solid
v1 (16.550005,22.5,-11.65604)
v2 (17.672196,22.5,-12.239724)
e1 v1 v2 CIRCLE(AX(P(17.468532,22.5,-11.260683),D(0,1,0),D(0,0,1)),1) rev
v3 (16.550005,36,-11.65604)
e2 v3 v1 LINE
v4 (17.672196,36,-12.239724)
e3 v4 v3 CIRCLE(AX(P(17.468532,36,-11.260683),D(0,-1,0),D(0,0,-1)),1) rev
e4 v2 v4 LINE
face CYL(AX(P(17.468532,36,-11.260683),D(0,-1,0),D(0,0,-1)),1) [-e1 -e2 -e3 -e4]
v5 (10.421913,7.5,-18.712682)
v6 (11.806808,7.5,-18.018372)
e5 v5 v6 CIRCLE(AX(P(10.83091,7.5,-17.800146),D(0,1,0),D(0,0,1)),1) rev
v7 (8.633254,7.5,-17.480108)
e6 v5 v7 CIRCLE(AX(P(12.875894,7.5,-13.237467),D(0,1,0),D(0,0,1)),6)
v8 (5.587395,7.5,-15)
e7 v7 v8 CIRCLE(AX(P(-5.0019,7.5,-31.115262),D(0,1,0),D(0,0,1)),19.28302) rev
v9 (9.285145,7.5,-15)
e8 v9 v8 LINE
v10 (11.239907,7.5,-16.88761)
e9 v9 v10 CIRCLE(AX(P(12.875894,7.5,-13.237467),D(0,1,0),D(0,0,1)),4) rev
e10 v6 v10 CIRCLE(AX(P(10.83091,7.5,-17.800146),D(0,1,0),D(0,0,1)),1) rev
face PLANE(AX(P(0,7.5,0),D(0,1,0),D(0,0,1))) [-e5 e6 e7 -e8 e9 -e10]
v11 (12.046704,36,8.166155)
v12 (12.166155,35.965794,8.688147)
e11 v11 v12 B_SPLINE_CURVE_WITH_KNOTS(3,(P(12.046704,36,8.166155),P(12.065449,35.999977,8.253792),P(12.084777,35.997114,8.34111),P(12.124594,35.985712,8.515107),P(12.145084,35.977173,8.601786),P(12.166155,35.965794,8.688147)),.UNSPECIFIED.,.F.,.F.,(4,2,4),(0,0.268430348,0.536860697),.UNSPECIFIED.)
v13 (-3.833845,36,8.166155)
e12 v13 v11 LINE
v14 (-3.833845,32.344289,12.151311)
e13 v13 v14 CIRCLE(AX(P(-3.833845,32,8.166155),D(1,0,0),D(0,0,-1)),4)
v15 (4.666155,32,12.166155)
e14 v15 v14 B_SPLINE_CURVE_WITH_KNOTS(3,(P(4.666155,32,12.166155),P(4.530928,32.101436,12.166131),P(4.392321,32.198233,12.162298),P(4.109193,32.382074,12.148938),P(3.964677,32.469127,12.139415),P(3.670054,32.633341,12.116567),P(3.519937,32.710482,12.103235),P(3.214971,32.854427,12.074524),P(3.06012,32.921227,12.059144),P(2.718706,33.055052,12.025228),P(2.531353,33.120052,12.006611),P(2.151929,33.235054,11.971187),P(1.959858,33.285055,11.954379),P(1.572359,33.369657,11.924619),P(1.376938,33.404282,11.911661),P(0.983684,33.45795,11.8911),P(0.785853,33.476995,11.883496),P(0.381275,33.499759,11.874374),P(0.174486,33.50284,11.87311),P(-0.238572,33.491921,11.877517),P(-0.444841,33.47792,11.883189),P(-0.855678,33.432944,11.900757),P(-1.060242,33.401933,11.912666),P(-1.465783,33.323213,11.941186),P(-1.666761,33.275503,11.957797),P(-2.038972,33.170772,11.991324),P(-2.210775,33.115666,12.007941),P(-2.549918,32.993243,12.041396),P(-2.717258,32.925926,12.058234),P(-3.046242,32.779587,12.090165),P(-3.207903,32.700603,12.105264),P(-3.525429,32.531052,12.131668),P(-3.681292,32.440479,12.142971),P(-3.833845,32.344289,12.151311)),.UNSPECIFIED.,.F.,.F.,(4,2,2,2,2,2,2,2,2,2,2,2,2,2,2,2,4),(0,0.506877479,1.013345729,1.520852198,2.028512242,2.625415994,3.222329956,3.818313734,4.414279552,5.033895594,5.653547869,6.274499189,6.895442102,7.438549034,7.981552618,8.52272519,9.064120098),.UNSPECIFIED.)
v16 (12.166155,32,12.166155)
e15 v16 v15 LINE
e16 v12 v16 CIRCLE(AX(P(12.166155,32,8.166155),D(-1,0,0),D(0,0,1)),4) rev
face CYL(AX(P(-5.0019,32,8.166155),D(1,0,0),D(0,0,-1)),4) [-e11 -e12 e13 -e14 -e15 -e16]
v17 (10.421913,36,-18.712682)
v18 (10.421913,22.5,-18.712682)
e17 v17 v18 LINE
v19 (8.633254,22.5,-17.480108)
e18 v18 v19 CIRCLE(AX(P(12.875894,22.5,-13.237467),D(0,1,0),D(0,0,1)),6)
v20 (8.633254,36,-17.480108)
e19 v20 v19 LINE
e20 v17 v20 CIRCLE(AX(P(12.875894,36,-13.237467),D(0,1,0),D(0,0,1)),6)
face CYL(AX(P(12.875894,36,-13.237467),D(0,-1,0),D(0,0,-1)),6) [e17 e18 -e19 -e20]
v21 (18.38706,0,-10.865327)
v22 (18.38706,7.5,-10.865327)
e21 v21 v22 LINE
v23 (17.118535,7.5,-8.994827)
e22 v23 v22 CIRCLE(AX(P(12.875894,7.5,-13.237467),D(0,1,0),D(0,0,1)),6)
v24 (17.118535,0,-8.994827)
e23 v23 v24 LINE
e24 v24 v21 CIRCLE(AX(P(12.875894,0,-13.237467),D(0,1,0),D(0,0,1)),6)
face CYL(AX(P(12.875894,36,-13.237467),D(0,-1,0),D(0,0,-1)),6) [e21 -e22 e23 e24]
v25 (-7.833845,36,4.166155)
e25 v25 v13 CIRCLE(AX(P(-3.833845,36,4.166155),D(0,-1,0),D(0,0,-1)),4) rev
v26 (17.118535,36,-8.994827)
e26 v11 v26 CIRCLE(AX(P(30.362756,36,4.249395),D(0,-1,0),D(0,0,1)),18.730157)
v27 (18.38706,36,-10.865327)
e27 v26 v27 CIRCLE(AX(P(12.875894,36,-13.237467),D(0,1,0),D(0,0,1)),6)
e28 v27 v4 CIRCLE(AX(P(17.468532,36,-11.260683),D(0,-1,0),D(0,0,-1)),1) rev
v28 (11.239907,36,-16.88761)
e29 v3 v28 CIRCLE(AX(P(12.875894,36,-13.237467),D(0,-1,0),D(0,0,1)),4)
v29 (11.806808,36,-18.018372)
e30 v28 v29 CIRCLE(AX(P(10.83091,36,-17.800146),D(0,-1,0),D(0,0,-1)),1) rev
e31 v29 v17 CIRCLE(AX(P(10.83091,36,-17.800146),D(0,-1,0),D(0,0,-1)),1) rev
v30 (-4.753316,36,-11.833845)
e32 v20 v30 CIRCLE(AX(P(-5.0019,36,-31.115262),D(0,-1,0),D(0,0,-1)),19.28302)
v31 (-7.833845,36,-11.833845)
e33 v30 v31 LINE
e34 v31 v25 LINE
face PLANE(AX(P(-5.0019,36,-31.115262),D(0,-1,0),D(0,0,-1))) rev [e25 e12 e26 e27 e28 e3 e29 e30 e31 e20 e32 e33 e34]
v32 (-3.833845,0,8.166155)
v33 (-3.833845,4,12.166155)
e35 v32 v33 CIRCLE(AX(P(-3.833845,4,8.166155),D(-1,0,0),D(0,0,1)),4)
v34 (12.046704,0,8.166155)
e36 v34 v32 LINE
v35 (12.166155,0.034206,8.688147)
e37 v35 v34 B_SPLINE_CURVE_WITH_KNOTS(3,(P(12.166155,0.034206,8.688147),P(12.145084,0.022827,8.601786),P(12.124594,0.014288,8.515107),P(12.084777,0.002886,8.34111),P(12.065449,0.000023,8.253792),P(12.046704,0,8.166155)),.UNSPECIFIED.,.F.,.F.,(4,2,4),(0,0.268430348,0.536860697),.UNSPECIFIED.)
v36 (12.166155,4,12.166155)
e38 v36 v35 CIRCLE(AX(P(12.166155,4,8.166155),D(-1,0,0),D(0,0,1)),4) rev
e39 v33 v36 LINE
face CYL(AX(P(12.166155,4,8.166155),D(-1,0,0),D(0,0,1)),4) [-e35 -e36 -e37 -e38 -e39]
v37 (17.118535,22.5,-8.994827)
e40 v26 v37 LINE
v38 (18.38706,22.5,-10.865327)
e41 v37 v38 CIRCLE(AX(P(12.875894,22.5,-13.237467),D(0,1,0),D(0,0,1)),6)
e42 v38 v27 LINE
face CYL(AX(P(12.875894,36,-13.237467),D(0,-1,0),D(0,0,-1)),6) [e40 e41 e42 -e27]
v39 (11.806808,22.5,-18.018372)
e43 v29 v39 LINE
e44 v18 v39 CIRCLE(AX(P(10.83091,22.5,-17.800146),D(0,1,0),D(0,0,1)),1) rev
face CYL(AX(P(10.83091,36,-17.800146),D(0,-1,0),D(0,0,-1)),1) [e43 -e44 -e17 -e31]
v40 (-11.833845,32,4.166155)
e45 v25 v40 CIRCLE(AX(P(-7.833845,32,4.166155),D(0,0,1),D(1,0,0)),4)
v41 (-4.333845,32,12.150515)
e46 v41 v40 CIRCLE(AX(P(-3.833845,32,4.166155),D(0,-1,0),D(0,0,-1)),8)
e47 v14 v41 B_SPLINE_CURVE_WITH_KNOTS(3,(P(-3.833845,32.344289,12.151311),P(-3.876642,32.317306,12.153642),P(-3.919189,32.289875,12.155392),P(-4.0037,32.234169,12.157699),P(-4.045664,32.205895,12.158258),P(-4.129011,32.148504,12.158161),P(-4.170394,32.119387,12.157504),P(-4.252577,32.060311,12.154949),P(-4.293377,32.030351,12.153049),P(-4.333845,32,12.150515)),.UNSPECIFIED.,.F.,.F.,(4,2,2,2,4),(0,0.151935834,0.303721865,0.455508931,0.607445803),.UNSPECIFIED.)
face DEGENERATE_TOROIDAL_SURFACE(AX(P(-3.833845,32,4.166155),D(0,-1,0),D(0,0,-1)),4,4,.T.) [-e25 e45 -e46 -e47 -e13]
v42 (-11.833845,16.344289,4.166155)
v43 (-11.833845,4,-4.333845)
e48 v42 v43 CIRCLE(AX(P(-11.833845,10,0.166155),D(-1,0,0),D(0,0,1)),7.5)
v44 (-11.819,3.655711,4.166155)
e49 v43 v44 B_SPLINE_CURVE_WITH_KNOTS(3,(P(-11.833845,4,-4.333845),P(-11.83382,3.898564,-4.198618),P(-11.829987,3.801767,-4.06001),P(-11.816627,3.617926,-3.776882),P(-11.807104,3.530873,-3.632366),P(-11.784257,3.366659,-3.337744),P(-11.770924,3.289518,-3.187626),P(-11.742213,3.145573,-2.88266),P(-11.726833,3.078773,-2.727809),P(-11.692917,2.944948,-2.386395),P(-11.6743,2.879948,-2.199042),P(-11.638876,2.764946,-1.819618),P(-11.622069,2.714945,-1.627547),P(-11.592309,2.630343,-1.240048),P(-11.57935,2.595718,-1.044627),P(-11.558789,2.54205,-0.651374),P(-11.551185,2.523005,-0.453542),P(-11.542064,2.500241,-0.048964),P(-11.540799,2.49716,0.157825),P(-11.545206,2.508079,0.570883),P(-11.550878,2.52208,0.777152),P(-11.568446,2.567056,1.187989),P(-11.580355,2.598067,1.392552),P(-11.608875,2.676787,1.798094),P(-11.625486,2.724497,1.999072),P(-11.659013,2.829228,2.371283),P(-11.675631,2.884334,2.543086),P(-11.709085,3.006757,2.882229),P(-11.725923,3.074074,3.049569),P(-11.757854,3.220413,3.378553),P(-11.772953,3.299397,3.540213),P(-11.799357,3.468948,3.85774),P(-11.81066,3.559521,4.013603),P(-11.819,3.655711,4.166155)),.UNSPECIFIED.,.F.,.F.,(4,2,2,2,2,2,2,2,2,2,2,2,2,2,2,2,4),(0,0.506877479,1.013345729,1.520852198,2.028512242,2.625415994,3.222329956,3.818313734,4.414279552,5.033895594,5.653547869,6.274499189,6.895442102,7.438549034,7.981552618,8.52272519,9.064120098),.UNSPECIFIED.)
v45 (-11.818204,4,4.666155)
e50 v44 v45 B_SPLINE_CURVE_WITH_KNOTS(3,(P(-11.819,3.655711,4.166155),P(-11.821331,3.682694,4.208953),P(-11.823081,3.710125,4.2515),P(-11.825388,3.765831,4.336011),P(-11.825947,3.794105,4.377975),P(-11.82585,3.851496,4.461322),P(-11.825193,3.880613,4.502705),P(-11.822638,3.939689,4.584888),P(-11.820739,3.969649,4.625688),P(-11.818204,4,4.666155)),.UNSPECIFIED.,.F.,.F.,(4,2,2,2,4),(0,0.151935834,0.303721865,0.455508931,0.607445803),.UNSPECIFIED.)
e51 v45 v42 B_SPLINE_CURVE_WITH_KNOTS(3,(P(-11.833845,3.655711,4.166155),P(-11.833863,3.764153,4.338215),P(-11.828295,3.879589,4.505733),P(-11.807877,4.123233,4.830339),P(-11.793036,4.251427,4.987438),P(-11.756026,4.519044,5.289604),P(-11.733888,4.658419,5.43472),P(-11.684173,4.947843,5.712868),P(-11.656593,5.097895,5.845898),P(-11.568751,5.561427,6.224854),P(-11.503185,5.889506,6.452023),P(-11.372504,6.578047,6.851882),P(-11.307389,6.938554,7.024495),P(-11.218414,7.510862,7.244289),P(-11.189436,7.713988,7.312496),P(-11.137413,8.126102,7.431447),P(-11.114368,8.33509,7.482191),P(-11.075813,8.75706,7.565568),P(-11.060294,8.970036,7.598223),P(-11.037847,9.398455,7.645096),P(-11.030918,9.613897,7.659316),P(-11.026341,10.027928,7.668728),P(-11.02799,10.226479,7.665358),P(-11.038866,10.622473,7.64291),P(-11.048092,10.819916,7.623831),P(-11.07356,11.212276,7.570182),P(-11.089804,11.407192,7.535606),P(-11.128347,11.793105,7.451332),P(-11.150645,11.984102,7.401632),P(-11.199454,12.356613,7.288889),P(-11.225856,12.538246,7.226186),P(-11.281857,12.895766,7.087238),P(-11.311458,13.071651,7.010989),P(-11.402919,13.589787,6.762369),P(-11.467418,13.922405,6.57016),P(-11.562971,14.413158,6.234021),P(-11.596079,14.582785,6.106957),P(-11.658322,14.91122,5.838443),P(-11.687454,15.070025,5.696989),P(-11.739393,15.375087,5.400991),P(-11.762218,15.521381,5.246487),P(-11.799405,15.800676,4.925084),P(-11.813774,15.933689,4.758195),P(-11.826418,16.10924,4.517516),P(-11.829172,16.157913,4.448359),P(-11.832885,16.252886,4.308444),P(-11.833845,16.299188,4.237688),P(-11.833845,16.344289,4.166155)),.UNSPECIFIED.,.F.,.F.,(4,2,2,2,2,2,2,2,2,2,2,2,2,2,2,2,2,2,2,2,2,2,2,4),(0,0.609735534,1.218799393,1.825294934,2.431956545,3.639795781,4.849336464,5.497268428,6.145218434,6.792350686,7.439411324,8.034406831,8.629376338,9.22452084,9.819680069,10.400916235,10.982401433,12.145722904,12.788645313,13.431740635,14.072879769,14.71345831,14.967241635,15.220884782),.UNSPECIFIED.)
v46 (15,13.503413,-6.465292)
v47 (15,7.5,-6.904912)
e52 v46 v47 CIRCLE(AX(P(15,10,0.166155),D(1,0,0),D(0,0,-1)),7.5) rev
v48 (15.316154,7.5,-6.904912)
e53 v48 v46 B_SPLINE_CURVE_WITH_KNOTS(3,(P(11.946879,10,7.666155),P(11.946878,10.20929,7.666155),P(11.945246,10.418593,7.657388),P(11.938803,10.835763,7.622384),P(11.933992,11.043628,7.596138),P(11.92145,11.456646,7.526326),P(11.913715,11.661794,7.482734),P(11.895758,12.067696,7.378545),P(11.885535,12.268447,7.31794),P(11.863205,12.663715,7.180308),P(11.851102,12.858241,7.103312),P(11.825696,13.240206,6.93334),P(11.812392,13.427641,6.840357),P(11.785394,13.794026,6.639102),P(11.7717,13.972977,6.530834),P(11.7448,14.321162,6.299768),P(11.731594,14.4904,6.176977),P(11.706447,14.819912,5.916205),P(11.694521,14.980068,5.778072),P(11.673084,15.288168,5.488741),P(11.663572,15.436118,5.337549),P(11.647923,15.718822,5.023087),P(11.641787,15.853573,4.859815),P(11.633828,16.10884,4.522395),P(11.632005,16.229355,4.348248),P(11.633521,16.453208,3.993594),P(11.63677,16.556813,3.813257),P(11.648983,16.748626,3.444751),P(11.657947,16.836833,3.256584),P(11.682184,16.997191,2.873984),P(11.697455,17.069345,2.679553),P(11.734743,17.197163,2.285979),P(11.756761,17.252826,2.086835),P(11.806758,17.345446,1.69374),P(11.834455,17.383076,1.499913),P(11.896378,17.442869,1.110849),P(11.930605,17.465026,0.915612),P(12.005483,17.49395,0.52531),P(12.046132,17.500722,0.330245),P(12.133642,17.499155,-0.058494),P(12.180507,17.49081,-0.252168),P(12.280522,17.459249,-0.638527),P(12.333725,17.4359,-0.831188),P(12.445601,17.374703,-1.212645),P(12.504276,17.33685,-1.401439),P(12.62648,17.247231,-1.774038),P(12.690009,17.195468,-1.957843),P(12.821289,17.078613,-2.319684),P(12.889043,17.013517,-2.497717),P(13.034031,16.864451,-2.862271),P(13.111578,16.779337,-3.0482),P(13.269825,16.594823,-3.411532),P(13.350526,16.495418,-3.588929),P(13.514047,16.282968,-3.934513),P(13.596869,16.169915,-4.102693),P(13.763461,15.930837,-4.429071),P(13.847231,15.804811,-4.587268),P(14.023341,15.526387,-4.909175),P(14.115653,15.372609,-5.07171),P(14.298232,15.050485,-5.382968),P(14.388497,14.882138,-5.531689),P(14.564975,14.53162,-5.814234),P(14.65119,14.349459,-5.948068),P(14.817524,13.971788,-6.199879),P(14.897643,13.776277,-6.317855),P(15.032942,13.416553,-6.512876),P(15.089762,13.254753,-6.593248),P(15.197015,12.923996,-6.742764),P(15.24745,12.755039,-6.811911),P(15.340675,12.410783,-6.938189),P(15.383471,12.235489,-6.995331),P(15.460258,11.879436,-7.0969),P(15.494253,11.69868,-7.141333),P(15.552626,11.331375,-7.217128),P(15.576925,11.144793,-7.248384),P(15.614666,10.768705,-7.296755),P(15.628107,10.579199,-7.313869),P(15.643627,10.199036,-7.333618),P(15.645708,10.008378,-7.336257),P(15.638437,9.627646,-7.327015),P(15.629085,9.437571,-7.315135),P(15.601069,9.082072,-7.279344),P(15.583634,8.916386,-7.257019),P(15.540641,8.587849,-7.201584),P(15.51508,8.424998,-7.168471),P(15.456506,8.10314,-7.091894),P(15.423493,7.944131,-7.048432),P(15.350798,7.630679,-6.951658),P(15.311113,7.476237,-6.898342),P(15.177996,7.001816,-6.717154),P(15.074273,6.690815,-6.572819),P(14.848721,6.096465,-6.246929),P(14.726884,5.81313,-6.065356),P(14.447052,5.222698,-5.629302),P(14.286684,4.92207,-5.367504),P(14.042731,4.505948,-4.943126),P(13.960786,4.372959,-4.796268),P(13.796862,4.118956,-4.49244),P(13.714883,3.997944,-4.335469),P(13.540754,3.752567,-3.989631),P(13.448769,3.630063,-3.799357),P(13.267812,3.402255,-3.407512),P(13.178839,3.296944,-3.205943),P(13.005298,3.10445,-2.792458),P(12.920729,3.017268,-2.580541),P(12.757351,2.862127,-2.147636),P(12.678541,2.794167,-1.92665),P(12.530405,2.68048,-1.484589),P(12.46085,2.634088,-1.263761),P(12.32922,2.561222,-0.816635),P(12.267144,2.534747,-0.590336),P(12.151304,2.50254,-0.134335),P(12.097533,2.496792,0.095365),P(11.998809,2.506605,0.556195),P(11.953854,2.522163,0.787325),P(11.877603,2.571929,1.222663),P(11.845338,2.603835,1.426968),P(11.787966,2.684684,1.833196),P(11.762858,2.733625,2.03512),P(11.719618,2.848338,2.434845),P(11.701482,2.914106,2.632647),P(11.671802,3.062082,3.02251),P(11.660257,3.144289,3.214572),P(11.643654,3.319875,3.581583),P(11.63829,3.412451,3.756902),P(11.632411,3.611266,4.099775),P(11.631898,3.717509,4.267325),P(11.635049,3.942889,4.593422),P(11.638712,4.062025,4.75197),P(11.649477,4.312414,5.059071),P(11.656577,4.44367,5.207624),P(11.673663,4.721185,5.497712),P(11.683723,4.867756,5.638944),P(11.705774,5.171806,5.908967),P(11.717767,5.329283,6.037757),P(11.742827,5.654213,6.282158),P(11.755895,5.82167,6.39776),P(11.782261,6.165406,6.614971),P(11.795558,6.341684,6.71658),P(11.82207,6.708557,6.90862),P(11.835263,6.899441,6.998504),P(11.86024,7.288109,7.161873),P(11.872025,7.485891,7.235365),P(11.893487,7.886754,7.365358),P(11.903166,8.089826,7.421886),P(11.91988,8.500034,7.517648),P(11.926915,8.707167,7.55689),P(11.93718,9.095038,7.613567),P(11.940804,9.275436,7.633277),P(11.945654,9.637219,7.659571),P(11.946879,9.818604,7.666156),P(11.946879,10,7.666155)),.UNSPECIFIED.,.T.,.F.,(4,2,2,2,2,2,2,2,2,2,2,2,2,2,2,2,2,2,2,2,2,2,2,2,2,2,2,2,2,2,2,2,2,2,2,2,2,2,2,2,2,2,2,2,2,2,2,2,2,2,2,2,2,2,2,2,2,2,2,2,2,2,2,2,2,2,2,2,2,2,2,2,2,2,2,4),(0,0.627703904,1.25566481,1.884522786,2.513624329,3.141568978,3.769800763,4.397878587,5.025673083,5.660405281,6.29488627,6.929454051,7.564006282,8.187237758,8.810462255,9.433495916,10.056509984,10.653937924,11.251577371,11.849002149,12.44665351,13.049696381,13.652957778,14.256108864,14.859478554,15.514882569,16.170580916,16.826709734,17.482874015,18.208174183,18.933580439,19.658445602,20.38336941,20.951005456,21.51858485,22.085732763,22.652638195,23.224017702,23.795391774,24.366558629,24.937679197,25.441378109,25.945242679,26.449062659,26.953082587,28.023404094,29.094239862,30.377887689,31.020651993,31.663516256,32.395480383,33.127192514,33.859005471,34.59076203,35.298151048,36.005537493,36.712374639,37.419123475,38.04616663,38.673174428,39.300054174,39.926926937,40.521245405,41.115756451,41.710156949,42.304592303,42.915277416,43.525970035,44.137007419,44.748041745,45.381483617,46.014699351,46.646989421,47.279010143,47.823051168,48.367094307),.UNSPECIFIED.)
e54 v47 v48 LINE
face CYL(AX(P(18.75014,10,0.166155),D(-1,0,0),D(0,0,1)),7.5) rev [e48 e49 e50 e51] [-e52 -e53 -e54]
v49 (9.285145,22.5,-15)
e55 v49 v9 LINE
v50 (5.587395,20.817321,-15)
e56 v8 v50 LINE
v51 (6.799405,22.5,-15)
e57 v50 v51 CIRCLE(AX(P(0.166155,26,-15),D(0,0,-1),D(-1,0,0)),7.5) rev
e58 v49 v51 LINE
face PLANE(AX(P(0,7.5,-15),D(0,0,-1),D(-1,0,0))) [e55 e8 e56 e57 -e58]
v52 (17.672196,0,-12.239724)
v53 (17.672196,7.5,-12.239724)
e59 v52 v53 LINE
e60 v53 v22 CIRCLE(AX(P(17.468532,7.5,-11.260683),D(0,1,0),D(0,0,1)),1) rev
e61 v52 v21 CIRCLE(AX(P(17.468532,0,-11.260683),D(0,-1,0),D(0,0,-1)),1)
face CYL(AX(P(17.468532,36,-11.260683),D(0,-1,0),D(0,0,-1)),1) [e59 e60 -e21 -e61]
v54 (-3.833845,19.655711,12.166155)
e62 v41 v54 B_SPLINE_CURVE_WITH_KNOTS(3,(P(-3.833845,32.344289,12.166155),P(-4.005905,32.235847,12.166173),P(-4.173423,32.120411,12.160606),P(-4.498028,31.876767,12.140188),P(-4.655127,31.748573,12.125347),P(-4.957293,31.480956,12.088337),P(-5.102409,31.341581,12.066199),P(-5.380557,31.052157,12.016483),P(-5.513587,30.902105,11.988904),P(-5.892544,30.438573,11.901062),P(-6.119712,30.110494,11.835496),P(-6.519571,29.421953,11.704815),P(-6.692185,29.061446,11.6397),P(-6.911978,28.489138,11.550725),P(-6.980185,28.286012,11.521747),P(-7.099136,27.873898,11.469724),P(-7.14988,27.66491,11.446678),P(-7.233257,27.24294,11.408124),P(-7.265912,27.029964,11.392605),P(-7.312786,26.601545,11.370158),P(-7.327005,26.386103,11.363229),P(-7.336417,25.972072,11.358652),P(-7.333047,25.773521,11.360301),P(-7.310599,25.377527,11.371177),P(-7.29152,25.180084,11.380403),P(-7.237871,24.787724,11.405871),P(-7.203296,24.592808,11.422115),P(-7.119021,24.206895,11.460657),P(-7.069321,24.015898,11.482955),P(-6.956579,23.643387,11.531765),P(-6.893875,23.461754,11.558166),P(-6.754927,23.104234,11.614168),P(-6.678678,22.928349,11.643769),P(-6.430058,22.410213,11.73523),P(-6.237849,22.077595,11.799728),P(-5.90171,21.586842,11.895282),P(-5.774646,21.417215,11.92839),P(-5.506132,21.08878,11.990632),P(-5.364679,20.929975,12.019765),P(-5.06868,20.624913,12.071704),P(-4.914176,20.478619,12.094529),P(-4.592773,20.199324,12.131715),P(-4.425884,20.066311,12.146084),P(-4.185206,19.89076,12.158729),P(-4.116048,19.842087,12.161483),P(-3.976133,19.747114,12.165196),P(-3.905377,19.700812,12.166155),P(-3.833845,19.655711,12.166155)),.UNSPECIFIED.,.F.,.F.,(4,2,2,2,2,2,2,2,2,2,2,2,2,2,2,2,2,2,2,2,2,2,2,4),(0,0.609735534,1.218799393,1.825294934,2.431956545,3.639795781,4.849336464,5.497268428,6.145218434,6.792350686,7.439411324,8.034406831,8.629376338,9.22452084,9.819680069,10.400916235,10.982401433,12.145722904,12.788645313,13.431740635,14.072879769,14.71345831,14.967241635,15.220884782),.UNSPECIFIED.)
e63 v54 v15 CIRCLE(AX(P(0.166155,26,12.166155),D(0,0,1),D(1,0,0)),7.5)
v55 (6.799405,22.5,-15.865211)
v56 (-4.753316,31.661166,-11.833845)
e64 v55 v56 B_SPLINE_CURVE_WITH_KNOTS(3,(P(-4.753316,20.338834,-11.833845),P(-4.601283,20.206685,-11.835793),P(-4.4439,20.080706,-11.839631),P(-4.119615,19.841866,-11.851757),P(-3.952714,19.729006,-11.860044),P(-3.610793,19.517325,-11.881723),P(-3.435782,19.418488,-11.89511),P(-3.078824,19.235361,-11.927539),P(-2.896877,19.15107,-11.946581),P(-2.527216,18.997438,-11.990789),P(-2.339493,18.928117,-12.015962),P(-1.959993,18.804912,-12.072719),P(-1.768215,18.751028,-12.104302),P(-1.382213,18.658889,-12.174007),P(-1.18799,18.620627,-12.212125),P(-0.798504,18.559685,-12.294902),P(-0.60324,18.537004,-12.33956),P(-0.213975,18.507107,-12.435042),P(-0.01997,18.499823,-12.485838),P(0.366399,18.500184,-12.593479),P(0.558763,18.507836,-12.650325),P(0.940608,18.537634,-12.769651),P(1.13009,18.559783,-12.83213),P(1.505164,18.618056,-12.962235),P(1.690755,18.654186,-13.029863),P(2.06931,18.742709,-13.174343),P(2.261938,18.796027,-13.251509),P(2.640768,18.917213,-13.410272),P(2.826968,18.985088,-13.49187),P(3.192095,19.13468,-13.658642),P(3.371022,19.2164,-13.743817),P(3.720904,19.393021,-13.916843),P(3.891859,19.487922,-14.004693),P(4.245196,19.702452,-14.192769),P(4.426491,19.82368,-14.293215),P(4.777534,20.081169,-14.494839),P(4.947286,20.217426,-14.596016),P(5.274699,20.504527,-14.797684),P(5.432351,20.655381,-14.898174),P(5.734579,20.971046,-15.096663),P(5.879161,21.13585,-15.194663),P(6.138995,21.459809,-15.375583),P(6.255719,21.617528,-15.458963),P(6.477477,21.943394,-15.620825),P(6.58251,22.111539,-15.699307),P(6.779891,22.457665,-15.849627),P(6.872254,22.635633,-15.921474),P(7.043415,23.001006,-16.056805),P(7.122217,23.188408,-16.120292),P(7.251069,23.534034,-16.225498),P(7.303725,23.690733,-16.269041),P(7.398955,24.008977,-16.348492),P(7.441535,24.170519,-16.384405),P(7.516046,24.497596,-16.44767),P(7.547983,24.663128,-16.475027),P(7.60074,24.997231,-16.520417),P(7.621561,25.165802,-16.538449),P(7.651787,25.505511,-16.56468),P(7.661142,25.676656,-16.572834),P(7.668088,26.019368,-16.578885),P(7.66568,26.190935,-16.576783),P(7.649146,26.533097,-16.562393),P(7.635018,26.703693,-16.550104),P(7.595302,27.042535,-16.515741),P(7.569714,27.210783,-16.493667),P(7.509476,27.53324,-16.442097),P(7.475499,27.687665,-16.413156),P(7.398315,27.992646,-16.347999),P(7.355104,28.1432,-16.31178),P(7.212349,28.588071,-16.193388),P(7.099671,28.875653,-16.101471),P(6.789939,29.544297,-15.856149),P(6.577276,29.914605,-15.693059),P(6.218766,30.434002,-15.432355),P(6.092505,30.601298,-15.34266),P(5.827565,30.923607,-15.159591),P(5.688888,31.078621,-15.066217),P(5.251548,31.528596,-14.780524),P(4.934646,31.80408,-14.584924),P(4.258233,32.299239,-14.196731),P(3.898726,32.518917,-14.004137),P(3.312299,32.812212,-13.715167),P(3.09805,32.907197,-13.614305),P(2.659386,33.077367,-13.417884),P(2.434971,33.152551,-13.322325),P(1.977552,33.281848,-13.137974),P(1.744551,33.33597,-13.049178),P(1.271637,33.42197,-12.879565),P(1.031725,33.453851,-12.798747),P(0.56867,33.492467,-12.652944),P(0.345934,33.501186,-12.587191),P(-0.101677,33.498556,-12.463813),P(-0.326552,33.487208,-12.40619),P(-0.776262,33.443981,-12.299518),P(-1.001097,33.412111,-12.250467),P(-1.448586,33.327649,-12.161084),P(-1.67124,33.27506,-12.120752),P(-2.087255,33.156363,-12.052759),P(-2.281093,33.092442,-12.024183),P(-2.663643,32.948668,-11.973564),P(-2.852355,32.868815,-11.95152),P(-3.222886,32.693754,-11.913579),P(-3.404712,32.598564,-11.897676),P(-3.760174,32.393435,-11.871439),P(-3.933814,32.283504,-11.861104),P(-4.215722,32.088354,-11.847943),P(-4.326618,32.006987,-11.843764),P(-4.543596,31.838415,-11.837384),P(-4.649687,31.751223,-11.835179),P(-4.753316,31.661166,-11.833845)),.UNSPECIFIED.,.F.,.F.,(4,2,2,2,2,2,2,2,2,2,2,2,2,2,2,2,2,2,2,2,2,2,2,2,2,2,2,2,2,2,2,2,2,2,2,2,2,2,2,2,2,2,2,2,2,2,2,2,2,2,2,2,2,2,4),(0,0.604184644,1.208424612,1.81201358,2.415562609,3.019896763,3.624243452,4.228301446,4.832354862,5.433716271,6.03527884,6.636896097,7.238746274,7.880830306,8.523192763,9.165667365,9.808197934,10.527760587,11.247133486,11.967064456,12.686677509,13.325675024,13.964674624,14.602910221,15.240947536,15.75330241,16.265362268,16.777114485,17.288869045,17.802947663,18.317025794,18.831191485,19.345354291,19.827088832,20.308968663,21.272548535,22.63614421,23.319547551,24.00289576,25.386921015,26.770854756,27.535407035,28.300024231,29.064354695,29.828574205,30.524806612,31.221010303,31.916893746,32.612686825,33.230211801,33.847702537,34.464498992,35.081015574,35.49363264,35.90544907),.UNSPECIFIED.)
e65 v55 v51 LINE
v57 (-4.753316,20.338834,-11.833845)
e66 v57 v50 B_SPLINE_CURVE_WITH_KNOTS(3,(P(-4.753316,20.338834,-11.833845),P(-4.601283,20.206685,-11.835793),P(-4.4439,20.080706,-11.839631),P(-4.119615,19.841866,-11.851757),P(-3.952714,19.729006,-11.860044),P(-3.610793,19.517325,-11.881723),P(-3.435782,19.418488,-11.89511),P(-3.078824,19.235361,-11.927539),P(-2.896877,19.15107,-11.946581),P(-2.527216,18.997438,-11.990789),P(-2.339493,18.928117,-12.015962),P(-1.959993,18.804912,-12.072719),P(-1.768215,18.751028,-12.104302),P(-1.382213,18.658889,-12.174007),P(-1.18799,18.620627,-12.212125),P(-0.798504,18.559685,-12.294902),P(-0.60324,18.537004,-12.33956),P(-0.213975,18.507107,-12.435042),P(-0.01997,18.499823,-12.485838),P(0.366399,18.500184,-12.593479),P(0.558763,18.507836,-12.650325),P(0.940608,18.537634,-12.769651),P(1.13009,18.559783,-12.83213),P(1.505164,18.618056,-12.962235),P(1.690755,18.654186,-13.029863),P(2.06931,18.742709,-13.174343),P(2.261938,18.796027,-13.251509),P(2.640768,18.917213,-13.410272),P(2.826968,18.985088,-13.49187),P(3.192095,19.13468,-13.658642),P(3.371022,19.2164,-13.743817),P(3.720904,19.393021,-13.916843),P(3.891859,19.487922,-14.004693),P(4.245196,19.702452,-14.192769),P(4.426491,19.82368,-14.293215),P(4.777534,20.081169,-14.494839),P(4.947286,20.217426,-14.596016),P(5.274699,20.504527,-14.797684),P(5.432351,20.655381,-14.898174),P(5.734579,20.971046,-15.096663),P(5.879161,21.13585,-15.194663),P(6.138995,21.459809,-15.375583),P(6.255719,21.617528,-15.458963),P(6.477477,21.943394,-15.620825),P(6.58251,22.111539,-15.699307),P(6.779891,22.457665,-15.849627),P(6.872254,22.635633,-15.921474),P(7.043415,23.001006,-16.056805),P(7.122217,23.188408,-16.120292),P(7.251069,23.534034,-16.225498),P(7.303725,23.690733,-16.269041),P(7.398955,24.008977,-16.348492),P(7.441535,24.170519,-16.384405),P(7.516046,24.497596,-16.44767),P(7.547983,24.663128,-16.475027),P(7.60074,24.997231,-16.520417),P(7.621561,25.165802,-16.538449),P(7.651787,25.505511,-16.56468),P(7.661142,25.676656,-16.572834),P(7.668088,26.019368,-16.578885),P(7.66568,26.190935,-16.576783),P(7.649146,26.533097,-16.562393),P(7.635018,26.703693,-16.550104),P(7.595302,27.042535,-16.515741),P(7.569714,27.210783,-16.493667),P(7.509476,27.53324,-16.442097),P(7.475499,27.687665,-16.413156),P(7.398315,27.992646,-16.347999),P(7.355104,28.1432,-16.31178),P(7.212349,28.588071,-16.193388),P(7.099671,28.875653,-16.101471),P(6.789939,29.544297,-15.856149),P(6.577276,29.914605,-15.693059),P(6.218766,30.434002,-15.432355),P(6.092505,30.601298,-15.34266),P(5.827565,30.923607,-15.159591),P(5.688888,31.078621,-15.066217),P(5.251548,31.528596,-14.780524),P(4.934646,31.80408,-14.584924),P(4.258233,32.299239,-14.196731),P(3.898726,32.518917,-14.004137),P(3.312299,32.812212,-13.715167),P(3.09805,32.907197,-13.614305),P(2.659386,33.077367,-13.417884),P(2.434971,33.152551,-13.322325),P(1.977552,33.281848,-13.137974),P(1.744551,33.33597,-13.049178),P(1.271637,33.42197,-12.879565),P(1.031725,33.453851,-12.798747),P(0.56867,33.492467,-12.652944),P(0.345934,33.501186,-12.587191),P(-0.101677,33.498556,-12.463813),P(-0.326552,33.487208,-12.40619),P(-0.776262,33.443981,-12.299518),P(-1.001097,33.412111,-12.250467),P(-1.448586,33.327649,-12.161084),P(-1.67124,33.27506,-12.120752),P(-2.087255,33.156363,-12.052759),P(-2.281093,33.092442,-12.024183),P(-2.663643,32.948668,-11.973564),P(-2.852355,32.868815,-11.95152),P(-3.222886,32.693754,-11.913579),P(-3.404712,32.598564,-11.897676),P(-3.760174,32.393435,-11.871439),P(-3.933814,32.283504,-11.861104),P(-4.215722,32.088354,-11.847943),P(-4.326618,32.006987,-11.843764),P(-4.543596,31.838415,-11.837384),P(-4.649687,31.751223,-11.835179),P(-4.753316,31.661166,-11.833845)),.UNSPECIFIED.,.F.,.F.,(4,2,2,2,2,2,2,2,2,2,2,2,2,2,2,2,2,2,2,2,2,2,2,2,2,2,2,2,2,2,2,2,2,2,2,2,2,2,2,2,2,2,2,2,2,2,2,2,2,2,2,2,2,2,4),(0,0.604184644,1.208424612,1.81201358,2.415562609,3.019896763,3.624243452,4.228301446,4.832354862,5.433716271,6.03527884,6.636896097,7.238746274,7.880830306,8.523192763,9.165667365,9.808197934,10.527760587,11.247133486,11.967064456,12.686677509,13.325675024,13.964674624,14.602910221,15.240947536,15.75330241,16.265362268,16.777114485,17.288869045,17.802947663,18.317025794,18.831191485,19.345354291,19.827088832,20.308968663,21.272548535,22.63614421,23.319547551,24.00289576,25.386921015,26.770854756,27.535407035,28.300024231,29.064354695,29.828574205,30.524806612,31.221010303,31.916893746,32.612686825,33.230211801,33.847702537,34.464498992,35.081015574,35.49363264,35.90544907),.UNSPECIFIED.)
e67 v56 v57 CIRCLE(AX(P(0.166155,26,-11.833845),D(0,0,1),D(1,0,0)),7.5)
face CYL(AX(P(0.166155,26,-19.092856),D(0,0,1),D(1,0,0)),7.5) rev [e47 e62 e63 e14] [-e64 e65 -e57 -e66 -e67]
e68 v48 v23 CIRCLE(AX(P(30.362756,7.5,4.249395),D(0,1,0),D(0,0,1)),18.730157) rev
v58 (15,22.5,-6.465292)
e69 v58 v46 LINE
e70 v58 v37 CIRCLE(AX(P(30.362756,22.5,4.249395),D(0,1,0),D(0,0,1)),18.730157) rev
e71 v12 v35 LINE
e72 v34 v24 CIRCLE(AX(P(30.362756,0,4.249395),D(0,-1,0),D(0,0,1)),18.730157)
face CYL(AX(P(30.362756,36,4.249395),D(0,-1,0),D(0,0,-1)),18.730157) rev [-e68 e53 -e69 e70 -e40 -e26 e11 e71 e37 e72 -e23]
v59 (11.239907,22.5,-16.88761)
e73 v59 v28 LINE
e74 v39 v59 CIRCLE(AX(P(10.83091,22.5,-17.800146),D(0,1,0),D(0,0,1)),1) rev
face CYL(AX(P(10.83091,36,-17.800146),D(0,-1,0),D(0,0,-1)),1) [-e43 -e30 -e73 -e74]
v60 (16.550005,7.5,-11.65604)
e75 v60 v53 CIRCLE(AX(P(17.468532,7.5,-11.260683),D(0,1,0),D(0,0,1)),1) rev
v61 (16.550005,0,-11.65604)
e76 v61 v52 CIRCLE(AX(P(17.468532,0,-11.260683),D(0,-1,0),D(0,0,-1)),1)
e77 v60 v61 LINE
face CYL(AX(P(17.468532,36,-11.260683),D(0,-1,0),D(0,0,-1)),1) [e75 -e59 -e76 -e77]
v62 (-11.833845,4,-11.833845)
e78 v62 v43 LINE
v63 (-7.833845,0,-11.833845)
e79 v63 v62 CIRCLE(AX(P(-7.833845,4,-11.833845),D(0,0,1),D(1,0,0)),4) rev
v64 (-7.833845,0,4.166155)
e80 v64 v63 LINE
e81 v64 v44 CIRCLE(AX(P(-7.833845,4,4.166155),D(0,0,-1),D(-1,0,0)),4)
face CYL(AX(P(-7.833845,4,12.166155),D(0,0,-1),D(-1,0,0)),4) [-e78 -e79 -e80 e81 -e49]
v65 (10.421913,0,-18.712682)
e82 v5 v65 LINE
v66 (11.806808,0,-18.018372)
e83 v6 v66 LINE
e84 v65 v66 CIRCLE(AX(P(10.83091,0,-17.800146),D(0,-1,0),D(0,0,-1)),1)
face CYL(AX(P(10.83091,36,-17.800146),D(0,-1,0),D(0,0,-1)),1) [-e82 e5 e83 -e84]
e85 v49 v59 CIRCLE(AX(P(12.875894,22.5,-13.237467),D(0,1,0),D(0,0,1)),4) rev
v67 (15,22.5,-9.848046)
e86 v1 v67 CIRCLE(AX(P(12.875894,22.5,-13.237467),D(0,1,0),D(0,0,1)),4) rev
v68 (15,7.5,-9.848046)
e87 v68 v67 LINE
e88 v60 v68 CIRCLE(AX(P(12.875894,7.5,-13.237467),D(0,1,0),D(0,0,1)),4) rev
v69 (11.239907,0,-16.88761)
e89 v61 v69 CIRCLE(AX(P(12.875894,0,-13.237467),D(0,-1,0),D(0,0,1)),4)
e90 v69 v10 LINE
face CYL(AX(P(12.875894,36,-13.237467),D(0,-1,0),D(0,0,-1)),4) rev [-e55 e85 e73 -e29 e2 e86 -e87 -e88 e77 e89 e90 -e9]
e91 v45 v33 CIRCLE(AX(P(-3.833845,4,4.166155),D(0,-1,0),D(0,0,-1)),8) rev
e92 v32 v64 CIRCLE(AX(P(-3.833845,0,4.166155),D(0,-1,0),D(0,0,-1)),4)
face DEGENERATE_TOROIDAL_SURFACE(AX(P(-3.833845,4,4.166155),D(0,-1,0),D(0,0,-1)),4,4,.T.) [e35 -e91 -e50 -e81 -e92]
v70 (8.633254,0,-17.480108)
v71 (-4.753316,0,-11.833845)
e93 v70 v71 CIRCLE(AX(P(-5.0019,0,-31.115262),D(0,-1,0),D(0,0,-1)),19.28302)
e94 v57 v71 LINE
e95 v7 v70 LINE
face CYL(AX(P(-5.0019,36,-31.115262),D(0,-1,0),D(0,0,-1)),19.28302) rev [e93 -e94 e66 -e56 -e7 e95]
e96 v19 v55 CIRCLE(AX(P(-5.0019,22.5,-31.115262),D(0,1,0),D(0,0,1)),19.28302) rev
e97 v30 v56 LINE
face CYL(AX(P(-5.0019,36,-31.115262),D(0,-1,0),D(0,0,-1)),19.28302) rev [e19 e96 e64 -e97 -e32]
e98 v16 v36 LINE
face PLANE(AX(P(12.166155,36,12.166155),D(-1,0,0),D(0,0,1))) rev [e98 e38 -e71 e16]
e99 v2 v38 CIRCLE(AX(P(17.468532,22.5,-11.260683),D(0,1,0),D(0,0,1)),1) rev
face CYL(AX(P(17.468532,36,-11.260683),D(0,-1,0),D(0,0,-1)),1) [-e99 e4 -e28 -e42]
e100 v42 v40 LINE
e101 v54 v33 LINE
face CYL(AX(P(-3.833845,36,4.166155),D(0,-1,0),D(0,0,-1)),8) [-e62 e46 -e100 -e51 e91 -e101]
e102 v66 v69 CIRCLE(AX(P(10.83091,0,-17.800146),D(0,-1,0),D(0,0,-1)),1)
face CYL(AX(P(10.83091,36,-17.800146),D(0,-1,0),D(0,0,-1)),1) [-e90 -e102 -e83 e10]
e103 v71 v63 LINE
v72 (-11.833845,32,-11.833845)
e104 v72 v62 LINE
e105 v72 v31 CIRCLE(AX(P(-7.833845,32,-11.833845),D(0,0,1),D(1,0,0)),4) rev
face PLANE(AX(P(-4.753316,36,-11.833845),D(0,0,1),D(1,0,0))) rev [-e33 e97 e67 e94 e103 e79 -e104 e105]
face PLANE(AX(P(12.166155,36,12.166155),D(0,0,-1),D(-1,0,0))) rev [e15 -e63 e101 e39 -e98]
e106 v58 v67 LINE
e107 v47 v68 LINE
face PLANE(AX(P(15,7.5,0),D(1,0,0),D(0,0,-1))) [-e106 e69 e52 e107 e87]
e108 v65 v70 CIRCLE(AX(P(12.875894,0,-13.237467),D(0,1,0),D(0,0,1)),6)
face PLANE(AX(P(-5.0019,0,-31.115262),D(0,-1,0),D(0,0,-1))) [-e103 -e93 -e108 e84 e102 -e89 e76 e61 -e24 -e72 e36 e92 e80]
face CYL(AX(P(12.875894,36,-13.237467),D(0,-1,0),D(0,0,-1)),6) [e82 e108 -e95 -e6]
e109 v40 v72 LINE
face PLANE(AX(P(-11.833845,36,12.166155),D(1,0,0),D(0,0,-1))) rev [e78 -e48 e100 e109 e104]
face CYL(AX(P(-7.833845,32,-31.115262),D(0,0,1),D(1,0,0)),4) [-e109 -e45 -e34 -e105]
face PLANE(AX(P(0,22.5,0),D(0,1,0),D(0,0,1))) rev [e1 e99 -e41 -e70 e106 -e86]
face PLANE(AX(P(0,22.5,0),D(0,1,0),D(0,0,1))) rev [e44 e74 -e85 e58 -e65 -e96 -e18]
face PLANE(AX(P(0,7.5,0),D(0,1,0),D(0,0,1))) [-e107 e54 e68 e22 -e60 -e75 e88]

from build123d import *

# Parameters (mm, degrees)
BOSS_EXTRUDE1_DEPTH = 36
SKETCH2_R           = 7.5
CUT_EXTRUDE1_DEPTH  = 51.950145011
SKETCH3_R           = 7.5
CUT_EXTRUDE2_DEPTH  = 52.231763324
FILLET1_R           = 8
FILLET2_R           = 4
FILLET3_R           = 1
FILLET4_R           = 1
CUT_EXTRUDE3_DEPTH  = 7.5


# Some blends are built 0.0001 mm under size
with BuildPart() as part:
    # Sketch1 → Boss-Extrude1 (new body)
    with BuildSketch(Plane(origin=(0, 0, 0), x_dir=(1, 0, 0), z_dir=(0, 1, 0))):
        with BuildLine():
            Line((12.166155414, -12.166155414), (-11.833844586, -12.166155414))
            Line((-11.833844586, -12.166155414), (-11.833844586, 11.833844586))
            Line((-11.833844586, 11.833844586), (-4.753315898, 11.833844586))
            ThreePointArc((-4.753315898, 11.833844586), (2.492071873, 13.348010377), (8.633253511, 17.480107918))
            ThreePointArc((8.633253511, 17.480107918), (9.98514832, 18.495184251), (11.566536194, 19.09285634))
            Line((11.566536194, 19.09285634), (12.002988862, 17.14105997))
            ThreePointArc((12.002988862, 17.14105997), (10.068614763, 10.388049365), (16.792058069, 12.422813601))
            Line((16.792058069, 12.422813601), (18.750140005, 12.015486787))
            ThreePointArc((18.750140005, 12.015486787), (18.154998777, 10.385966776), (17.118534885, 8.994826544))
            ThreePointArc((17.118534885, 8.994826544), (12.32659232, 0.801901017), (12.166155414, -8.688146518))
            Line((12.166155414, -8.688146518), (12.166155414, -12.166155414))
        make_face()
    extrude(amount=BOSS_EXTRUDE1_DEPTH)

    # Sketch2 → Cut-Extrude1 (cut, through all)
    with BuildSketch(Plane.ZY.offset(11.833844586)):
        with Locations((0.166155414, 10)):
            Circle(SKETCH2_R)
    extrude(amount=-CUT_EXTRUDE1_DEPTH, mode=Mode.SUBTRACT)

    # Sketch3 → Cut-Extrude2 (cut, through all)
    with BuildSketch(Plane.XY.offset(12.166155414)):
        with Locations((0.166155414, 26)):
            Circle(SKETCH3_R)
    extrude(amount=-CUT_EXTRUDE2_DEPTH, mode=Mode.SUBTRACT)

    # Fillet1
    # the kernel refuses this fillet: 8 mm, written as the material it takes off along each edge
    with BuildSketch(Plane(origin=(-11.833844586, -20, 12.166155414), x_dir=(1, 0, 0), z_dir=(0, 1, 0))) as fillet1_piece_1:
        with BuildLine():
            CenterArc((FILLET1_R, FILLET1_R), FILLET1_R, 180, 90)
            Line((0, FILLET1_R), (0, 0))
            Line((0, 0), (FILLET1_R, 0))
        make_face()
    extrude(amount=76, mode=Mode.SUBTRACT)

    # Fillet2
    # the kernel refuses this fillet: 4 mm, written as the material it takes off along each edge
    with BuildSketch(Plane(origin=(-11.833844586, 0, 4.166155414), x_dir=(1, 0, 0), z_dir=(0, 0, -1)), Plane(origin=(22.166155414, 36, 12.166155414), x_dir=(0, -1, 0), z_dir=(-1, 0, 0))) as fillet2_piece_1:
        with BuildLine():
            CenterArc((FILLET2_R, -FILLET2_R), FILLET2_R, 90, 90)
            Line((0, -FILLET2_R), (0, 0))
            Line((0, 0), (FILLET2_R, 0))
        make_face()
    extrude(amount=26, mode=Mode.SUBTRACT)
    with BuildSketch(Plane(origin=(-3.833844586, 0, 4.166155414), x_dir=(0, 0, 1), z_dir=(1, 0, 0))) as fillet2_piece_2:
        with BuildLine():
            CenterArc((8 - FILLET2_R, -FILLET2_R), FILLET2_R, 0, 90)
            Line((8, -FILLET2_R), (8, 0))
            Line((8, 0), (8 - FILLET2_R, 0))
        make_face()
    revolve(axis=Axis((-3.833844586, 0, 4.166155414), (0, -1, 0)), revolution_arc=90, mode=Mode.SUBTRACT)
    with BuildSketch(Plane(origin=(-3.833844586, 36, 4.166155414), x_dir=(0, 0, 1), z_dir=(1, 0, 0))) as fillet2_piece_3:
        with BuildLine():
            CenterArc((8 - FILLET2_R, FILLET2_R), FILLET2_R, 270, 90)
            Line((8, FILLET2_R), (8, 0))
            Line((8, 0), (8 - FILLET2_R, 0))
        make_face()
    revolve(axis=Axis((-3.833844586, 36, 4.166155414), (0, -1, 0)), revolution_arc=90, mode=Mode.SUBTRACT)
    with BuildSketch(Plane(origin=(22.166155414, 0, 12.166155414), x_dir=(0, 1, 0), z_dir=(-1, 0, 0)), Plane(origin=(-11.833844586, 36, 4.166155414), x_dir=(1, 0, 0), z_dir=(0, 0, -1))) as fillet2_piece_4:
        with BuildLine():
            CenterArc((FILLET2_R, FILLET2_R), FILLET2_R, 180, 90)
            Line((0, FILLET2_R), (0, 0))
            Line((0, 0), (FILLET2_R, 0))
        make_face()
    extrude(amount=26, mode=Mode.SUBTRACT)

    # Fillet3
    fillet3_edges = [part.edges().sort_by_distance(p)[0] for p in [
        (12.002988862, 18, -17.14105997),
        (16.792058069, 18, -12.422813601),
    ]]
    fillet(fillet3_edges, radius=FILLET3_R)

    # Fillet4
    fillet4_edges = [part.edges().sort_by_distance(p)[0] for p in [
        (11.566536194, 18, -19.09285634),
        (18.750140005, 18, -12.015486787),
    ]]
    fillet(fillet4_edges, radius=FILLET4_R - 0.0001)  # a hair under: the kernel refuses the full size

    # Sketch4 → Cut-Extrude3 (cut, symmetric)
    with BuildSketch(Plane(origin=(0, 15, 0), x_dir=(1, 0, 0), z_dir=(0, 1, 0))):
        Polygon((15, 15), (15, 0), (27.823989989, 3.609418598), (23.424788661, 30.402201484), (6.171676897, 29.445037867), (0, 15), align=None)
    extrude(amount=CUT_EXTRUDE3_DEPTH, both=True, mode=Mode.SUBTRACT)


solid = part.part
